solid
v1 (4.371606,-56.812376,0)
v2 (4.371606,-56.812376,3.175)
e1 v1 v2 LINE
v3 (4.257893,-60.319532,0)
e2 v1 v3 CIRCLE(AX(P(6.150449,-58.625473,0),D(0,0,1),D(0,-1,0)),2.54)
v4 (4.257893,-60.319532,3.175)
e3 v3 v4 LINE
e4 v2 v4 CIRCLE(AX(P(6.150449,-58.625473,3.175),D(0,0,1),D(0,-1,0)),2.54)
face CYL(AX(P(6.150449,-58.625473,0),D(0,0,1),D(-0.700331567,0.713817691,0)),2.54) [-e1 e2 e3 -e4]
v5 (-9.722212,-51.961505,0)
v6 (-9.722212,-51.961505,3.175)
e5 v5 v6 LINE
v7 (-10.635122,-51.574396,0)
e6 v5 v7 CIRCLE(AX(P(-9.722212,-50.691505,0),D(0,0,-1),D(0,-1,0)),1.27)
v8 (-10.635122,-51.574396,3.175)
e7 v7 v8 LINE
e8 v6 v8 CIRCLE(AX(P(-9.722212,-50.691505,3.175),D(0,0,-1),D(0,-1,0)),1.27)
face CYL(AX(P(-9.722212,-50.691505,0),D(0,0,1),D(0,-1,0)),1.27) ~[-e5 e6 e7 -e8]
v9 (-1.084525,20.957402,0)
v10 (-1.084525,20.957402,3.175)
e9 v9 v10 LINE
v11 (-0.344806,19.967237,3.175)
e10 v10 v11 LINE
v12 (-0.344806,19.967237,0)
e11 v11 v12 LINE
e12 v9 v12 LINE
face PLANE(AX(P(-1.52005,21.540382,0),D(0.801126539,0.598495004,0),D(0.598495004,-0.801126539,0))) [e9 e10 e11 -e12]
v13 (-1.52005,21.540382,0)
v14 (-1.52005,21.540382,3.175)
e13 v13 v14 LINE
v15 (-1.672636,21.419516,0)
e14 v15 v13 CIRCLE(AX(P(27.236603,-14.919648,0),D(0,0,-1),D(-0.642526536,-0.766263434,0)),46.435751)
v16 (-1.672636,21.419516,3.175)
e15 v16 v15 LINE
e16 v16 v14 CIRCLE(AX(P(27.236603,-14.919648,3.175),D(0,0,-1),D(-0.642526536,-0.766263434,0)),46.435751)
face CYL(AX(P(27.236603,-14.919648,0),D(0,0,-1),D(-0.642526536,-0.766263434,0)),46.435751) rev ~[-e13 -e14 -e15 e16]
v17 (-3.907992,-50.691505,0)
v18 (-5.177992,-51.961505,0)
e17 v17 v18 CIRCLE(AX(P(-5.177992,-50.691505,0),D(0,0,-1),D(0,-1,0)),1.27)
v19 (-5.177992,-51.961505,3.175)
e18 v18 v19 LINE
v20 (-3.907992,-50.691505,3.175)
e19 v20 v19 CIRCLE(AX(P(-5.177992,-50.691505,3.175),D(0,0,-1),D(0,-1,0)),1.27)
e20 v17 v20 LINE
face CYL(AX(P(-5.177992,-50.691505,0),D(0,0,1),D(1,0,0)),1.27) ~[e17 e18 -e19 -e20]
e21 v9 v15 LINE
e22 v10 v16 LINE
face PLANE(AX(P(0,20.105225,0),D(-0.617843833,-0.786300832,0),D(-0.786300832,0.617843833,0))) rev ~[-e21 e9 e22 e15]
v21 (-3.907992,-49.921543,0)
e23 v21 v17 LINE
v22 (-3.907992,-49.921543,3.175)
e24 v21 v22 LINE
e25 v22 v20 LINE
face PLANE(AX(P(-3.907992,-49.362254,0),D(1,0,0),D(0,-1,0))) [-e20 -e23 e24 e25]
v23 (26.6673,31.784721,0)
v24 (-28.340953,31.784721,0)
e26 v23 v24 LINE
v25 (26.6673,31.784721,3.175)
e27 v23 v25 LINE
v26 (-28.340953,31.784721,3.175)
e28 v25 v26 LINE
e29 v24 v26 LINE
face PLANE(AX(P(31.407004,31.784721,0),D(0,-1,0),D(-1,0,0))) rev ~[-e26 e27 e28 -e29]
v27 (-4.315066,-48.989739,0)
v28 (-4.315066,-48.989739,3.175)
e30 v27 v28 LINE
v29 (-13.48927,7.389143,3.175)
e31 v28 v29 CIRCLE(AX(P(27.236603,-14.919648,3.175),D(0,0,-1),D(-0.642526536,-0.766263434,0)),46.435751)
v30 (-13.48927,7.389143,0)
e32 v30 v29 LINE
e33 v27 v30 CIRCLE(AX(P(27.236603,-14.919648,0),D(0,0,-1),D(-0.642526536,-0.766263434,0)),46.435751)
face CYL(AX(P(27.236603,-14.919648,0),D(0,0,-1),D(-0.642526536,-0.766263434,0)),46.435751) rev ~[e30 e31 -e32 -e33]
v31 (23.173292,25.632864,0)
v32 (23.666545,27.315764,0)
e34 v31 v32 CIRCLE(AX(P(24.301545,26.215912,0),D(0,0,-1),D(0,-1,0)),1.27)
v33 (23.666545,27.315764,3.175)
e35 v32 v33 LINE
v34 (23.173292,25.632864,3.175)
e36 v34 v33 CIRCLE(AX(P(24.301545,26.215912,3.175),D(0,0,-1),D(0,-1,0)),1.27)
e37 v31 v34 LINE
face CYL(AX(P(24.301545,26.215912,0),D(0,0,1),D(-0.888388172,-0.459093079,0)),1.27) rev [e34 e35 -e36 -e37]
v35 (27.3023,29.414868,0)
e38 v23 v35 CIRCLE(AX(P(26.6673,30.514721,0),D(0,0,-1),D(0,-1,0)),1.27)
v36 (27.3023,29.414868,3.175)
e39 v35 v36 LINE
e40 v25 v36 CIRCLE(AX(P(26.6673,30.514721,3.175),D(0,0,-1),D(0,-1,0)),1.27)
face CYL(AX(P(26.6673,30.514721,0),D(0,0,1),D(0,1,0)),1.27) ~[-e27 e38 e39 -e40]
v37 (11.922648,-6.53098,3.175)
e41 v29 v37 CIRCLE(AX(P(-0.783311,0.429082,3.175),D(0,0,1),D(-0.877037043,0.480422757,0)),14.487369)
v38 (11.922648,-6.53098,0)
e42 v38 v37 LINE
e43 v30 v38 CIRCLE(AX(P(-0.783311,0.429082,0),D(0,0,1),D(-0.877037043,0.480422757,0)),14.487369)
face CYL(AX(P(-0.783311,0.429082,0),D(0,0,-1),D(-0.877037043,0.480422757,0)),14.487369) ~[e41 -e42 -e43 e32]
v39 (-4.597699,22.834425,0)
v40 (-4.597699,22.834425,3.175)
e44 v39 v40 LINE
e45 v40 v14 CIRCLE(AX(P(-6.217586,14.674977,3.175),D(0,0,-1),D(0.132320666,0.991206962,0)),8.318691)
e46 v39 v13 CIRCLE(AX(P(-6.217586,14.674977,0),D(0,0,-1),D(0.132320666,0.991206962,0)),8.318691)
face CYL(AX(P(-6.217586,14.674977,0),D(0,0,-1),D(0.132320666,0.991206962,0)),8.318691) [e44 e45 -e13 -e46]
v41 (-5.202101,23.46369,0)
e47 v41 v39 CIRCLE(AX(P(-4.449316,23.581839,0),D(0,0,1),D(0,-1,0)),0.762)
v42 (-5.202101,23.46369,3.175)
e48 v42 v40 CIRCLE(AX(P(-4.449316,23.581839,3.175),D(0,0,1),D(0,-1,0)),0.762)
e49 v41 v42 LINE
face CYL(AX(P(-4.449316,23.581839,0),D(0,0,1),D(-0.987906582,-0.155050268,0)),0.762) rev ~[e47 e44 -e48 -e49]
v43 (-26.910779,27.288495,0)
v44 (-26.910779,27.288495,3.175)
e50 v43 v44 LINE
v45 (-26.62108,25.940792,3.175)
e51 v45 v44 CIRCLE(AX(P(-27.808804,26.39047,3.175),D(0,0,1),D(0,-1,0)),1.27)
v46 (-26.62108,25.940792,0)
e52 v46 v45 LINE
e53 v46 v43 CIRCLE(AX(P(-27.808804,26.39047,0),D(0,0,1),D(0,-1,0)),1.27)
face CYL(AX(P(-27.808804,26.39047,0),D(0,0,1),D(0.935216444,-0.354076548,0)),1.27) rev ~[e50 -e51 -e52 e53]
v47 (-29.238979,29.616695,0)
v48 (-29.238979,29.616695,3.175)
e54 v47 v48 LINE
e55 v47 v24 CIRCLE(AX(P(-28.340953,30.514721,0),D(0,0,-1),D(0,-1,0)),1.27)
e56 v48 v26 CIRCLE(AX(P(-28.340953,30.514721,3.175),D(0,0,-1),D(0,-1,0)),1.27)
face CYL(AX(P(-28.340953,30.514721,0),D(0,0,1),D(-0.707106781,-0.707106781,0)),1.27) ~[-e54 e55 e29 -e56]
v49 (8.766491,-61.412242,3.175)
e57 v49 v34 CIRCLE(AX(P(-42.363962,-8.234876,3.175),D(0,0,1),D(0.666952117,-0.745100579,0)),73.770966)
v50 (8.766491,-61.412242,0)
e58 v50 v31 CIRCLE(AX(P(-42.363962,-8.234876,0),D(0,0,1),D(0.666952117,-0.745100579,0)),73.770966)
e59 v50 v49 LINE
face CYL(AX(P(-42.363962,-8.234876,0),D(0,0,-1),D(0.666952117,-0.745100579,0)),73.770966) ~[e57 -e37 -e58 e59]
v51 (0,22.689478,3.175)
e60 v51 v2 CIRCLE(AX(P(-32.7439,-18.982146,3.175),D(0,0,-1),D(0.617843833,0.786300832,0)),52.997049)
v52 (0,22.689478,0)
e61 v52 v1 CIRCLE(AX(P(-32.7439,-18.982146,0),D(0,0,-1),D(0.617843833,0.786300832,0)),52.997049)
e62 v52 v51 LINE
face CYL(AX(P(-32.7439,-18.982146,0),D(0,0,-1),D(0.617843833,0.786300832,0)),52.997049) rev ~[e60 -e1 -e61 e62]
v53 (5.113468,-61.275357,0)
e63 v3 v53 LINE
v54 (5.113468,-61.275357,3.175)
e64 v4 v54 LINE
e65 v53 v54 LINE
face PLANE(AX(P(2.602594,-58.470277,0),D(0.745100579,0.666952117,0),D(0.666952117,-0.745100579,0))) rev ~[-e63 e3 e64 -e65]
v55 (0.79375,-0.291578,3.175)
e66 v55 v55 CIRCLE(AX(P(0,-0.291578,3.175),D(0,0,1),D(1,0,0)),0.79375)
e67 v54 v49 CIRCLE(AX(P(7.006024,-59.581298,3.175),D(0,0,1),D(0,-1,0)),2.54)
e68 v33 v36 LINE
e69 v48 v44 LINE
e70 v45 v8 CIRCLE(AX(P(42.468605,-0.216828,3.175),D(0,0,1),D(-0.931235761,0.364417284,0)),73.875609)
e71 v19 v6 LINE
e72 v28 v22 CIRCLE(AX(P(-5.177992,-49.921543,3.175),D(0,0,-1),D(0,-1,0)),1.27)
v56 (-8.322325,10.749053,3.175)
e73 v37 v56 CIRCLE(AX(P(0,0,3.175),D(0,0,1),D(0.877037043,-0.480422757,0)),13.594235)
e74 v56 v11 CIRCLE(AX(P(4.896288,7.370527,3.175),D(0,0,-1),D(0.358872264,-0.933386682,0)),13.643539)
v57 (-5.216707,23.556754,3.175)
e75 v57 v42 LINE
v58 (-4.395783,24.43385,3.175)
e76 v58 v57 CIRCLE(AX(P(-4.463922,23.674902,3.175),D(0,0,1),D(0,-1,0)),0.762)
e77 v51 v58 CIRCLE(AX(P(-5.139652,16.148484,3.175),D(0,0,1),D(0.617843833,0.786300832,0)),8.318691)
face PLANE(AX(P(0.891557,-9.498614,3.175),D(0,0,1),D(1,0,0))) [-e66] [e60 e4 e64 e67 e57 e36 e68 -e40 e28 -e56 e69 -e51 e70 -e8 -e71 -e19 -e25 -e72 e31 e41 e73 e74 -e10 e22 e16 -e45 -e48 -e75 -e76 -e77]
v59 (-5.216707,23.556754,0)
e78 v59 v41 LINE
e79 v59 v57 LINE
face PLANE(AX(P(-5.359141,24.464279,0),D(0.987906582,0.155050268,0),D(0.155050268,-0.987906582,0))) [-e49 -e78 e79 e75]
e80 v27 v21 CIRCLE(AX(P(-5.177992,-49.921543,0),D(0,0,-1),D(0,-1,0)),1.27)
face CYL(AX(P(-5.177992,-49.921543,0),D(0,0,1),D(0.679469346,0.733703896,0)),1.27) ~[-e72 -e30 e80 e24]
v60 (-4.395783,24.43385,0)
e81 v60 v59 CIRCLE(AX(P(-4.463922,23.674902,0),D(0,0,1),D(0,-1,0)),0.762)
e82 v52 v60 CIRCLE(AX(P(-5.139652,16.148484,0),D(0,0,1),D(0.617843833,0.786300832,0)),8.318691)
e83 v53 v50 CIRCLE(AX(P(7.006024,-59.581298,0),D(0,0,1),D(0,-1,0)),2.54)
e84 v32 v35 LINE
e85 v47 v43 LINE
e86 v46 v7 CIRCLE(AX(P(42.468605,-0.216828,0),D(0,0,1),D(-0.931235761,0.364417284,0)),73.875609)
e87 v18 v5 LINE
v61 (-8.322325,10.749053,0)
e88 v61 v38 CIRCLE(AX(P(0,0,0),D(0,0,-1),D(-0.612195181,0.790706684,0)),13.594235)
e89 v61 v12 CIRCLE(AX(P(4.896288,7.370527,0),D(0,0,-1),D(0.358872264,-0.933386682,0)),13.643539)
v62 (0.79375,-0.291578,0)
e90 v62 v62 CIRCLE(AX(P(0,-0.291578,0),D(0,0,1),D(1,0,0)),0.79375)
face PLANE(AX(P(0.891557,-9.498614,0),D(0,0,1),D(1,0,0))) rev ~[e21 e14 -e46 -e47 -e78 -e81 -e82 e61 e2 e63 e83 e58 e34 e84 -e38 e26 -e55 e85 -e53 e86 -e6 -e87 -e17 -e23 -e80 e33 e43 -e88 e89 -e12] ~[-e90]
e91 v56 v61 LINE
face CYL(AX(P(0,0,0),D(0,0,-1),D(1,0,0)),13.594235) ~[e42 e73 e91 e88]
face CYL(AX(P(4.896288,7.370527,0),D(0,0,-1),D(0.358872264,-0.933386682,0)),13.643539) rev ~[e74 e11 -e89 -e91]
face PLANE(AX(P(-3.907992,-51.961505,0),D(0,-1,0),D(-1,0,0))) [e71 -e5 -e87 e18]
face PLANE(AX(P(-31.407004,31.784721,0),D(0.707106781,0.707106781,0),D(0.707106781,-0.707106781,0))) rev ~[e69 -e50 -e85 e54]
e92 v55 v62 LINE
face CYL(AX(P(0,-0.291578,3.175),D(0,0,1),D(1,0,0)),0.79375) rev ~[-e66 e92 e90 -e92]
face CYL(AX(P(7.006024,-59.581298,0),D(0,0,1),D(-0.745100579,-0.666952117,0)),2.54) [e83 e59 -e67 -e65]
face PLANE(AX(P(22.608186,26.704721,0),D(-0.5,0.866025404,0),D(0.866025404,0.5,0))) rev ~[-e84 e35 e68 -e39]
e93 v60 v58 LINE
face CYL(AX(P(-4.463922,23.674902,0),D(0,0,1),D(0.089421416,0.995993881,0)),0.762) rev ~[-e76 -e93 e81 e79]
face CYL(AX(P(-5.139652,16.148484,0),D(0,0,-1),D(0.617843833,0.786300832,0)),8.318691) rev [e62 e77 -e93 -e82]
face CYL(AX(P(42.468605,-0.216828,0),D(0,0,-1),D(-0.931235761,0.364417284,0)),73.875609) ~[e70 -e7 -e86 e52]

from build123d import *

# Parameters (mm, degrees)
F2_DEPTH  = 3.175
F1_R      = 13.594235125
F4_DEPTH  = 3.175
F6_DEPTH  = 3.175
F7_R      = 1.27
F8_R      = 0.762
F9_R      = 0.79375
F10_DEPTH = 3.176
F11_R     = 2.54


with BuildPart() as f2:
    # F1 (on face) → F2 (new body)
    with BuildSketch(Plane.XY):
        with BuildLine():
            Line((31.4070041795, 31.7847206253), (-31.4070041795, 31.7847206253))
            Line((-31.4070041795, 31.7847206253), (-26.3270041795, 26.7047206253))
            ThreePointArc((-26.3270041795, 26.7047206253), (-29.4018182362, -17.3120874939), (-6.8377400748, -55.230371411))
            Line((-6.8377400748, -55.230371411), (-2.5995985028, -50.5016658783))
            ThreePointArc((-2.5995985028, -50.5016658783), (-19.1698848855, -13.2713854087), (0, 22.6894778752))
            ThreePointArc((0, 22.6894778752), (20.2259208041, -17.2835334321), (2.6025941293, -58.4702772006))
            Line((2.6025941293, -58.4702772006), (6.8377400748, -63.2016658783))
            ThreePointArc((6.8377400748, -63.2016658783), (30.2976275511, -20.9804187613), (22.6081860771, 26.7047206253))
            Line((22.6081860771, 26.7047206253), (31.4070041795, 31.7847206253))
        make_face()
    extrude(amount=F2_DEPTH)



with BuildPart() as f2b:
    # F1 (on face) → F2, piece 2 (new body)
    with BuildSketch(Plane.XY):
        Circle(F1_R)
    extrude(amount=F2_DEPTH)


with BuildPart() as f2_1:
    add(f2.part)

    add(f2b.part)  # F4 merges F2b
    # F3 (on face) → F4 (join, through all)
    with BuildSketch(Plane.XY):
        with BuildLine():
            Line((-5.2498336251, 24.2303351167), (-13.4892699034, 7.3891431238))
            ThreePointArc((-13.4892699034, 7.3891431238), (-7.7433725843, -12.2768772355), (11.922647775, -6.5309799163))
            Line((11.922647775, -6.5309799163), (9.7925756653, -5.3641704599))
            ThreePointArc((9.7925756653, -5.3641704599), (-7.8384100149, 2.474239555), (0, 20.1052252351))
            Line((0, 20.1052252351), (-5.2498336251, 24.2303351167))
        make_face()
    extrude(amount=F4_DEPTH)

    # F5 (on face) → F6 (cut, through all)
    with BuildSketch(Plane.XY):
        Polygon((-3.9079916846, -49.3622544157), (-3.9079916846, -51.9615052849), (-10.2579916846, -51.9615052849), (-10.2579916846, -62.6840499783), (0, -56.9217726588), (-2.6145169004, -45.902473209), align=None)
        with BuildLine():
            Line((0, 19.5056907833), (0, 22.6894778752))
            ThreePointArc((0, 22.6894778752), (-2.5244121089, 24.0453912744), (-5.359141473, 24.4642791758))
            Line((-5.359141473, 24.4642791758), (-5.1168514161, 22.9205221383))
            ThreePointArc((-5.1168514161, 22.9205221383), (-3.237454866, 22.4415366371), (-1.5200501793, 21.5403820193))
            Line((-1.5200501793, 21.5403820193), (0, 19.5056907833))
        make_face()
    extrude(amount=F6_DEPTH, mode=Mode.SUBTRACT)

    # F7
    f7_edges = [f2_1.edges().sort_by_distance(p)[0] for p in [
        (-31.407004, 31.784721, 1.5875),
        (-26.327004, 26.704721, 1.5875),
        (31.407004, 31.784721, 1.5875),
        (22.608186, 26.704721, 1.5875),
        (-3.907992, -49.362254, 1.5875),
        (-3.907992, -51.961505, 1.5875),
        (-10.257992, -51.961505, 1.5875),
    ]]
    fillet(f7_edges, radius=F7_R)

    # F8
    f8_edges = [f2_1.edges().sort_by_distance(p)[0] for p in [
        (-5.359141, 24.464279, 1.5875),
        (-5.116851, 22.920522, 1.5875),
    ]]
    fillet(f8_edges, radius=F8_R)

    # F9 (on face) → F10 (cut, through all)
    with BuildSketch(Plane.XY.offset(3.175)):
        with Locations((0, -0.2915779182)):
            Circle(F9_R)
    extrude(amount=-F10_DEPTH, mode=Mode.SUBTRACT)

    # F11
    f11_edges = [f2_1.edges().sort_by_distance(p)[0] for p in [
        (2.602594, -58.470277, 1.5875),
        (6.83774, -63.201666, 1.5875),
    ]]
    fillet(f11_edges, radius=F11_R)


solid = f2_1.part
